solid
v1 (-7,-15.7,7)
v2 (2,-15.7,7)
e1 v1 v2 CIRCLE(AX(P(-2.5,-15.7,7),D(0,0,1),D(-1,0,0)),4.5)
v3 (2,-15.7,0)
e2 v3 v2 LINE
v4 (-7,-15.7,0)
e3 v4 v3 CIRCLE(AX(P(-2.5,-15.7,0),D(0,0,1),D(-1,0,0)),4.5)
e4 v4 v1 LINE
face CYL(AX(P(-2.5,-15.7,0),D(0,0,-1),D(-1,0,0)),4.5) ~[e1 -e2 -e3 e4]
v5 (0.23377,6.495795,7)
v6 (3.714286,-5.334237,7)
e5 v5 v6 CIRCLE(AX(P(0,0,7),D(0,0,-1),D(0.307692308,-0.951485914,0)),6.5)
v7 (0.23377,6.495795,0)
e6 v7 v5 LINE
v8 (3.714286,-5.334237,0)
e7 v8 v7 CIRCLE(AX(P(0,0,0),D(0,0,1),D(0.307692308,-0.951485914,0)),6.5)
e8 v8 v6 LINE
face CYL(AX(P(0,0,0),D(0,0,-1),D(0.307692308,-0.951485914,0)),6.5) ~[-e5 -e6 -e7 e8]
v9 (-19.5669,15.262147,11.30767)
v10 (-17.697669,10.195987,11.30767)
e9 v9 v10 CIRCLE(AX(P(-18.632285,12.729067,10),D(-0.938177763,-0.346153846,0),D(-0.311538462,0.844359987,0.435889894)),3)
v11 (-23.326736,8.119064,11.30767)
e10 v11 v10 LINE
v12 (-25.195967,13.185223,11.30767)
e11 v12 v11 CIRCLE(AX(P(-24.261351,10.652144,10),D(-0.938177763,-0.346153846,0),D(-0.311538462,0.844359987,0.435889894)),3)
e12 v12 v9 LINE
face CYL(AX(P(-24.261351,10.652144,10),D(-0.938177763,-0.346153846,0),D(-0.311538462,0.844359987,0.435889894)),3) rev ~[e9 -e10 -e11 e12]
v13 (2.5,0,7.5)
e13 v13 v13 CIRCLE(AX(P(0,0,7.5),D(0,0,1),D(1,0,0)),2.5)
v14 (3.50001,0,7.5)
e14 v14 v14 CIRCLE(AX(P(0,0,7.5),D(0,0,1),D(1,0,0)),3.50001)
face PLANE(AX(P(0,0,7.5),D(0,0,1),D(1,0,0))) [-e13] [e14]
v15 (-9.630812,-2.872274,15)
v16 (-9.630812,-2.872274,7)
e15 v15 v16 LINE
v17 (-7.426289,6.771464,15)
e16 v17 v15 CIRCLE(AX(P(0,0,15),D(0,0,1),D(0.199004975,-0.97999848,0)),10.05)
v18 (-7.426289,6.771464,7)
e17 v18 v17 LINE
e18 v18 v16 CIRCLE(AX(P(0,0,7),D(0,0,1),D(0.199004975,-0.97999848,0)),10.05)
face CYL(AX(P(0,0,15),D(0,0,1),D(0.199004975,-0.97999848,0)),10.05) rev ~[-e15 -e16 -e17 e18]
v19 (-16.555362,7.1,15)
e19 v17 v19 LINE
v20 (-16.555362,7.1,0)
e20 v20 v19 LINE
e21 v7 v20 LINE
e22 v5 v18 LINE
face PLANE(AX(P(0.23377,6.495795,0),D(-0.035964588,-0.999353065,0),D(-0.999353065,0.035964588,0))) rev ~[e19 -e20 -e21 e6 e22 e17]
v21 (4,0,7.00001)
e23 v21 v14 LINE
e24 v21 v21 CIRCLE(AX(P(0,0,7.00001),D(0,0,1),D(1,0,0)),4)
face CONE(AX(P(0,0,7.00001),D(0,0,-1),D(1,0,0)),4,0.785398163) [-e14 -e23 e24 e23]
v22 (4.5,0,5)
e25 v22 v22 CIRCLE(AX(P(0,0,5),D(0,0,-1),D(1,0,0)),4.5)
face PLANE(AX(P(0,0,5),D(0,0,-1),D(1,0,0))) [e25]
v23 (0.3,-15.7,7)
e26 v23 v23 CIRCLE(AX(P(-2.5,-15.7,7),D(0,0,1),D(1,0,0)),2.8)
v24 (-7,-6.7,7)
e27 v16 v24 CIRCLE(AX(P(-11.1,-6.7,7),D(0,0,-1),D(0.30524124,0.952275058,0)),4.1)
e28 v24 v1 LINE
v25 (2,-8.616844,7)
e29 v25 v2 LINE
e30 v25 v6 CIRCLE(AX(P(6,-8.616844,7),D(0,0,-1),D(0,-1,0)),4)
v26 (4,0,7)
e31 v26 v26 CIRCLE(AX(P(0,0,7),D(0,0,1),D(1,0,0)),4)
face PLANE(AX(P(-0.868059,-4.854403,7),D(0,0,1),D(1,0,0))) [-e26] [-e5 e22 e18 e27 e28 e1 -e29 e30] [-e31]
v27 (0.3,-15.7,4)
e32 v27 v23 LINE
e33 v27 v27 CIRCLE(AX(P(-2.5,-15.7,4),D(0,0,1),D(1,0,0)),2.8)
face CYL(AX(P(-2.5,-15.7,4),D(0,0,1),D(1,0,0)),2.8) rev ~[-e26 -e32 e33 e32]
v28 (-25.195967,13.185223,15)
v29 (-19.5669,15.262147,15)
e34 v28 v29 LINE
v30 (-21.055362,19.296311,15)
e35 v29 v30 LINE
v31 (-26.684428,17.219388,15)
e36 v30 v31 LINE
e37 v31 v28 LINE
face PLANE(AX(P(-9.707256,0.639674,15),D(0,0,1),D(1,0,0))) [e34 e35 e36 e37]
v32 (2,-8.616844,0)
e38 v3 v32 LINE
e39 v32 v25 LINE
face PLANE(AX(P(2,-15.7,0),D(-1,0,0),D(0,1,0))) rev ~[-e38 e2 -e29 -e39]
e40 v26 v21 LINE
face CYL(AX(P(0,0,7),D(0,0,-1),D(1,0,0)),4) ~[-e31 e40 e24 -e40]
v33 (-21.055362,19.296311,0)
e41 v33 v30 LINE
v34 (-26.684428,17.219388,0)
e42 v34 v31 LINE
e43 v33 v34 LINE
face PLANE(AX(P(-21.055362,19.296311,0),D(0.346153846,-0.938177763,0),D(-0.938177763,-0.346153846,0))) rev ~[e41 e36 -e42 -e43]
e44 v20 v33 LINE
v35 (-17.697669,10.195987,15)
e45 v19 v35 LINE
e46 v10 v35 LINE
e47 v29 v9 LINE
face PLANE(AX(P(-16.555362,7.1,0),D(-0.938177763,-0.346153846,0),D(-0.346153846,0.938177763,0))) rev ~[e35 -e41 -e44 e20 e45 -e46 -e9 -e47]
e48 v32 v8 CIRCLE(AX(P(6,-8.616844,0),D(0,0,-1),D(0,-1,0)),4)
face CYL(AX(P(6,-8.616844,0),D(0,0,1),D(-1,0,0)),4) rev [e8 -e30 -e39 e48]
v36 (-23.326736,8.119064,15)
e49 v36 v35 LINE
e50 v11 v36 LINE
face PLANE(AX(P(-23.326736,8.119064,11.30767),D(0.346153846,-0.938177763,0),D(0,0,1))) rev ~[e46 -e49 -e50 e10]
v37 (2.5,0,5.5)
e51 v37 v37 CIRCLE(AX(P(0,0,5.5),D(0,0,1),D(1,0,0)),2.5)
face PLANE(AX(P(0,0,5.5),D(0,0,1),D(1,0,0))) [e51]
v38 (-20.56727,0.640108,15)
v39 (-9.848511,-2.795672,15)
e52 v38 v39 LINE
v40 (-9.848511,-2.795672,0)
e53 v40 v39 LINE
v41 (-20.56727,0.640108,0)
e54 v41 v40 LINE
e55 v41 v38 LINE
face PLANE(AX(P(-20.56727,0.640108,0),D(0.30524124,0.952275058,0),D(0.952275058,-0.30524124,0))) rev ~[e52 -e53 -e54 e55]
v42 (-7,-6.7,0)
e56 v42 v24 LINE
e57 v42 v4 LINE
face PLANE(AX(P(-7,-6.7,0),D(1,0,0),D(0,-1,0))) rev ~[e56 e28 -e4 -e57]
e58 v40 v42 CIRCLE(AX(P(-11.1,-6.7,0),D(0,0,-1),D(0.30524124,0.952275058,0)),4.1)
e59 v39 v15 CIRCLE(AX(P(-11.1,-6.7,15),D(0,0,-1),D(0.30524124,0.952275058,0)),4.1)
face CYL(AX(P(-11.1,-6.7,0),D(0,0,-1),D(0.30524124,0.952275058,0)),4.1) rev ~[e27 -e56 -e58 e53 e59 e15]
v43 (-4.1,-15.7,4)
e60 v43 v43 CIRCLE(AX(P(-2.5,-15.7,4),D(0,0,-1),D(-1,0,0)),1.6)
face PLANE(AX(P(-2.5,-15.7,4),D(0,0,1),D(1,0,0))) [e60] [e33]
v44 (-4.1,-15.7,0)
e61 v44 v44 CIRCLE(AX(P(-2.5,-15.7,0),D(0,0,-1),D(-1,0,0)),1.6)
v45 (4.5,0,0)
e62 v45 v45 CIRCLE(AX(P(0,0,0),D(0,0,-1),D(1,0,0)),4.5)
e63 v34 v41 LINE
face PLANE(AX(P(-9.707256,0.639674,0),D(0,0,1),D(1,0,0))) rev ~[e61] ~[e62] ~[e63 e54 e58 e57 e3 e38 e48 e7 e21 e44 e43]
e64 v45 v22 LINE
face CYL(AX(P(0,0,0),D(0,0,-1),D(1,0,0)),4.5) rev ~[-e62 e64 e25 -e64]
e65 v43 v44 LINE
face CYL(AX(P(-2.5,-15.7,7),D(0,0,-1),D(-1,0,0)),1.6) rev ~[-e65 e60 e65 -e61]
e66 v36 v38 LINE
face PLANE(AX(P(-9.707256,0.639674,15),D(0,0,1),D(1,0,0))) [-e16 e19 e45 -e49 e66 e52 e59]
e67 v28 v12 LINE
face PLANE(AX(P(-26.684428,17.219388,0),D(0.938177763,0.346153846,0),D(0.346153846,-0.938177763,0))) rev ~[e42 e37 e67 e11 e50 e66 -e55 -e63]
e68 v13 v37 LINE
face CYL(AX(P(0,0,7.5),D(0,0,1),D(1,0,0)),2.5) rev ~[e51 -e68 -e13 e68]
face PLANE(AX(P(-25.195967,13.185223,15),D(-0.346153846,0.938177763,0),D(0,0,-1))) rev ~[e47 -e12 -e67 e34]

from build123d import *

# Parameters (mm, degrees)
F1_DEPTH       = 15
F3_DEPTH       = 8
F5_D           = 3.2
F5_CBORE_D     = 5.6
F5_CBORE_DEPTH = 3
F6_R           = 4.5
F7_DEPTH       = 5
F8_R           = 4
F9_DEPTH       = 0.5
F10_R          = 2.5
F11_DEPTH      = 2
F12_SIZE       = 0.49999
F14_DEPTH      = 6
F15_R          = 4


# Not quite as in the source:
# - a fillet or chamfer is up to 0.001 mm smaller than in the source, because OpenCascade refuses the exact size


with BuildPart() as f1:
    # F0 (on Top) → F1 (new body)
    with BuildSketch(Plane.XY):
        with BuildLine():
            Line((2, -15.7), (2, -6.1846584384))
            ThreePointArc((2, -6.1846584384), (6.437849506, 0.8967127402), (0.2337698218, 6.4957949221))
            Line((0.2337698218, 6.4957949221), (-16.5553616693, 7.1))
            Line((-16.5553616693, 7.1), (-21.0553616693, 19.2963109177))
            Line((-21.0553616693, 19.2963109177), (-26.6844282466, 17.2193878407))
            Line((-26.6844282466, 17.2193878407), (-20.5672701971, 0.6401075063))
            Line((-20.5672701971, 0.6401075063), (-9.8485109145, -2.7956722641))
            ThreePointArc((-9.8485109145, -2.7956722641), (-7.7878175435, -4.283505147), (-7, -6.7))
            Line((-7, -6.7), (-7, -15.7))
            ThreePointArc((-7, -15.7), (-2.5, -20.2), (2, -15.7))
        make_face()
    extrude(amount=F1_DEPTH)

    # F2 (on face) → F3 (cut)
    with BuildSketch(Plane.XY.offset(15)):
        with BuildLine():
            Line((2, -15.7), (2, -9.8489847192))
            ThreePointArc((2, -9.8489847192), (2.8265485956, 9.6443311347), (-7, -7.2112758927))
            Line((-7, -7.2112758927), (-7, -15.7))
            ThreePointArc((-7, -15.7), (-2.5, -20.2), (2, -15.7))
        make_face()
    extrude(amount=-F3_DEPTH, mode=Mode.SUBTRACT)

    # F5 (through all)
    with Locations(Plane.XY.offset(7)):
        with Locations((-2.5, -15.7)):
            CounterBoreHole(F5_D / 2, F5_CBORE_D / 2, F5_CBORE_DEPTH)

    # F6 (on face) → F7 (cut)
    with BuildSketch(Plane(origin=(0, 0, 0), x_dir=(1, 0, 0), z_dir=(0, 0, -1))):
        Circle(F6_R)
    extrude(amount=-F7_DEPTH, mode=Mode.SUBTRACT)

    # F8 (on face) → F9 (join)
    with BuildSketch(Plane.XY.offset(7)):
        Circle(F8_R)
    extrude(amount=F9_DEPTH)

    # F10 (on face) → F11 (cut)
    with BuildSketch(Plane.XY.offset(7.5)):
        Circle(F10_R)
    extrude(amount=-F11_DEPTH, mode=Mode.SUBTRACT)

    # F12 (size 0.5 in the source; OpenCascade refuses exactly that, so slightly less here)
    f12_edges = [f1.edges().sort_by_distance(p)[0] for p in [
        (-4, 0, 7.5),
    ]]
    chamfer(f12_edges, length=F12_SIZE)

    # F13 (on face) → F14 (cut, through all)
    with BuildSketch(Plane(origin=(-17.8949713968, -6.6026007232, 0), x_dir=(0.3461538462, -0.9381777629, 0), z_dir=(-0.9381777629, -0.3461538462, 0))):
        with BuildLine():
            Line((-15.6917642328, 15), (-21.0917642328, 15))
            Line((-21.0917642328, 15), (-21.0917642328, 11.3076696831))
            ThreePointArc((-21.0917642328, 11.3076696831), (-18.3917642328, 7), (-15.6917642328, 11.3076696831))
            Line((-15.6917642328, 11.3076696831), (-15.6917642328, 15))
        make_face()
    extrude(amount=-F14_DEPTH, mode=Mode.SUBTRACT)

    # F15
    f15_edges = [f1.edges().sort_by_distance(p)[0] for p in [
        (2, -6.184658, 3.5),
    ]]
    fillet(f15_edges, radius=F15_R)


solid = f1.part
